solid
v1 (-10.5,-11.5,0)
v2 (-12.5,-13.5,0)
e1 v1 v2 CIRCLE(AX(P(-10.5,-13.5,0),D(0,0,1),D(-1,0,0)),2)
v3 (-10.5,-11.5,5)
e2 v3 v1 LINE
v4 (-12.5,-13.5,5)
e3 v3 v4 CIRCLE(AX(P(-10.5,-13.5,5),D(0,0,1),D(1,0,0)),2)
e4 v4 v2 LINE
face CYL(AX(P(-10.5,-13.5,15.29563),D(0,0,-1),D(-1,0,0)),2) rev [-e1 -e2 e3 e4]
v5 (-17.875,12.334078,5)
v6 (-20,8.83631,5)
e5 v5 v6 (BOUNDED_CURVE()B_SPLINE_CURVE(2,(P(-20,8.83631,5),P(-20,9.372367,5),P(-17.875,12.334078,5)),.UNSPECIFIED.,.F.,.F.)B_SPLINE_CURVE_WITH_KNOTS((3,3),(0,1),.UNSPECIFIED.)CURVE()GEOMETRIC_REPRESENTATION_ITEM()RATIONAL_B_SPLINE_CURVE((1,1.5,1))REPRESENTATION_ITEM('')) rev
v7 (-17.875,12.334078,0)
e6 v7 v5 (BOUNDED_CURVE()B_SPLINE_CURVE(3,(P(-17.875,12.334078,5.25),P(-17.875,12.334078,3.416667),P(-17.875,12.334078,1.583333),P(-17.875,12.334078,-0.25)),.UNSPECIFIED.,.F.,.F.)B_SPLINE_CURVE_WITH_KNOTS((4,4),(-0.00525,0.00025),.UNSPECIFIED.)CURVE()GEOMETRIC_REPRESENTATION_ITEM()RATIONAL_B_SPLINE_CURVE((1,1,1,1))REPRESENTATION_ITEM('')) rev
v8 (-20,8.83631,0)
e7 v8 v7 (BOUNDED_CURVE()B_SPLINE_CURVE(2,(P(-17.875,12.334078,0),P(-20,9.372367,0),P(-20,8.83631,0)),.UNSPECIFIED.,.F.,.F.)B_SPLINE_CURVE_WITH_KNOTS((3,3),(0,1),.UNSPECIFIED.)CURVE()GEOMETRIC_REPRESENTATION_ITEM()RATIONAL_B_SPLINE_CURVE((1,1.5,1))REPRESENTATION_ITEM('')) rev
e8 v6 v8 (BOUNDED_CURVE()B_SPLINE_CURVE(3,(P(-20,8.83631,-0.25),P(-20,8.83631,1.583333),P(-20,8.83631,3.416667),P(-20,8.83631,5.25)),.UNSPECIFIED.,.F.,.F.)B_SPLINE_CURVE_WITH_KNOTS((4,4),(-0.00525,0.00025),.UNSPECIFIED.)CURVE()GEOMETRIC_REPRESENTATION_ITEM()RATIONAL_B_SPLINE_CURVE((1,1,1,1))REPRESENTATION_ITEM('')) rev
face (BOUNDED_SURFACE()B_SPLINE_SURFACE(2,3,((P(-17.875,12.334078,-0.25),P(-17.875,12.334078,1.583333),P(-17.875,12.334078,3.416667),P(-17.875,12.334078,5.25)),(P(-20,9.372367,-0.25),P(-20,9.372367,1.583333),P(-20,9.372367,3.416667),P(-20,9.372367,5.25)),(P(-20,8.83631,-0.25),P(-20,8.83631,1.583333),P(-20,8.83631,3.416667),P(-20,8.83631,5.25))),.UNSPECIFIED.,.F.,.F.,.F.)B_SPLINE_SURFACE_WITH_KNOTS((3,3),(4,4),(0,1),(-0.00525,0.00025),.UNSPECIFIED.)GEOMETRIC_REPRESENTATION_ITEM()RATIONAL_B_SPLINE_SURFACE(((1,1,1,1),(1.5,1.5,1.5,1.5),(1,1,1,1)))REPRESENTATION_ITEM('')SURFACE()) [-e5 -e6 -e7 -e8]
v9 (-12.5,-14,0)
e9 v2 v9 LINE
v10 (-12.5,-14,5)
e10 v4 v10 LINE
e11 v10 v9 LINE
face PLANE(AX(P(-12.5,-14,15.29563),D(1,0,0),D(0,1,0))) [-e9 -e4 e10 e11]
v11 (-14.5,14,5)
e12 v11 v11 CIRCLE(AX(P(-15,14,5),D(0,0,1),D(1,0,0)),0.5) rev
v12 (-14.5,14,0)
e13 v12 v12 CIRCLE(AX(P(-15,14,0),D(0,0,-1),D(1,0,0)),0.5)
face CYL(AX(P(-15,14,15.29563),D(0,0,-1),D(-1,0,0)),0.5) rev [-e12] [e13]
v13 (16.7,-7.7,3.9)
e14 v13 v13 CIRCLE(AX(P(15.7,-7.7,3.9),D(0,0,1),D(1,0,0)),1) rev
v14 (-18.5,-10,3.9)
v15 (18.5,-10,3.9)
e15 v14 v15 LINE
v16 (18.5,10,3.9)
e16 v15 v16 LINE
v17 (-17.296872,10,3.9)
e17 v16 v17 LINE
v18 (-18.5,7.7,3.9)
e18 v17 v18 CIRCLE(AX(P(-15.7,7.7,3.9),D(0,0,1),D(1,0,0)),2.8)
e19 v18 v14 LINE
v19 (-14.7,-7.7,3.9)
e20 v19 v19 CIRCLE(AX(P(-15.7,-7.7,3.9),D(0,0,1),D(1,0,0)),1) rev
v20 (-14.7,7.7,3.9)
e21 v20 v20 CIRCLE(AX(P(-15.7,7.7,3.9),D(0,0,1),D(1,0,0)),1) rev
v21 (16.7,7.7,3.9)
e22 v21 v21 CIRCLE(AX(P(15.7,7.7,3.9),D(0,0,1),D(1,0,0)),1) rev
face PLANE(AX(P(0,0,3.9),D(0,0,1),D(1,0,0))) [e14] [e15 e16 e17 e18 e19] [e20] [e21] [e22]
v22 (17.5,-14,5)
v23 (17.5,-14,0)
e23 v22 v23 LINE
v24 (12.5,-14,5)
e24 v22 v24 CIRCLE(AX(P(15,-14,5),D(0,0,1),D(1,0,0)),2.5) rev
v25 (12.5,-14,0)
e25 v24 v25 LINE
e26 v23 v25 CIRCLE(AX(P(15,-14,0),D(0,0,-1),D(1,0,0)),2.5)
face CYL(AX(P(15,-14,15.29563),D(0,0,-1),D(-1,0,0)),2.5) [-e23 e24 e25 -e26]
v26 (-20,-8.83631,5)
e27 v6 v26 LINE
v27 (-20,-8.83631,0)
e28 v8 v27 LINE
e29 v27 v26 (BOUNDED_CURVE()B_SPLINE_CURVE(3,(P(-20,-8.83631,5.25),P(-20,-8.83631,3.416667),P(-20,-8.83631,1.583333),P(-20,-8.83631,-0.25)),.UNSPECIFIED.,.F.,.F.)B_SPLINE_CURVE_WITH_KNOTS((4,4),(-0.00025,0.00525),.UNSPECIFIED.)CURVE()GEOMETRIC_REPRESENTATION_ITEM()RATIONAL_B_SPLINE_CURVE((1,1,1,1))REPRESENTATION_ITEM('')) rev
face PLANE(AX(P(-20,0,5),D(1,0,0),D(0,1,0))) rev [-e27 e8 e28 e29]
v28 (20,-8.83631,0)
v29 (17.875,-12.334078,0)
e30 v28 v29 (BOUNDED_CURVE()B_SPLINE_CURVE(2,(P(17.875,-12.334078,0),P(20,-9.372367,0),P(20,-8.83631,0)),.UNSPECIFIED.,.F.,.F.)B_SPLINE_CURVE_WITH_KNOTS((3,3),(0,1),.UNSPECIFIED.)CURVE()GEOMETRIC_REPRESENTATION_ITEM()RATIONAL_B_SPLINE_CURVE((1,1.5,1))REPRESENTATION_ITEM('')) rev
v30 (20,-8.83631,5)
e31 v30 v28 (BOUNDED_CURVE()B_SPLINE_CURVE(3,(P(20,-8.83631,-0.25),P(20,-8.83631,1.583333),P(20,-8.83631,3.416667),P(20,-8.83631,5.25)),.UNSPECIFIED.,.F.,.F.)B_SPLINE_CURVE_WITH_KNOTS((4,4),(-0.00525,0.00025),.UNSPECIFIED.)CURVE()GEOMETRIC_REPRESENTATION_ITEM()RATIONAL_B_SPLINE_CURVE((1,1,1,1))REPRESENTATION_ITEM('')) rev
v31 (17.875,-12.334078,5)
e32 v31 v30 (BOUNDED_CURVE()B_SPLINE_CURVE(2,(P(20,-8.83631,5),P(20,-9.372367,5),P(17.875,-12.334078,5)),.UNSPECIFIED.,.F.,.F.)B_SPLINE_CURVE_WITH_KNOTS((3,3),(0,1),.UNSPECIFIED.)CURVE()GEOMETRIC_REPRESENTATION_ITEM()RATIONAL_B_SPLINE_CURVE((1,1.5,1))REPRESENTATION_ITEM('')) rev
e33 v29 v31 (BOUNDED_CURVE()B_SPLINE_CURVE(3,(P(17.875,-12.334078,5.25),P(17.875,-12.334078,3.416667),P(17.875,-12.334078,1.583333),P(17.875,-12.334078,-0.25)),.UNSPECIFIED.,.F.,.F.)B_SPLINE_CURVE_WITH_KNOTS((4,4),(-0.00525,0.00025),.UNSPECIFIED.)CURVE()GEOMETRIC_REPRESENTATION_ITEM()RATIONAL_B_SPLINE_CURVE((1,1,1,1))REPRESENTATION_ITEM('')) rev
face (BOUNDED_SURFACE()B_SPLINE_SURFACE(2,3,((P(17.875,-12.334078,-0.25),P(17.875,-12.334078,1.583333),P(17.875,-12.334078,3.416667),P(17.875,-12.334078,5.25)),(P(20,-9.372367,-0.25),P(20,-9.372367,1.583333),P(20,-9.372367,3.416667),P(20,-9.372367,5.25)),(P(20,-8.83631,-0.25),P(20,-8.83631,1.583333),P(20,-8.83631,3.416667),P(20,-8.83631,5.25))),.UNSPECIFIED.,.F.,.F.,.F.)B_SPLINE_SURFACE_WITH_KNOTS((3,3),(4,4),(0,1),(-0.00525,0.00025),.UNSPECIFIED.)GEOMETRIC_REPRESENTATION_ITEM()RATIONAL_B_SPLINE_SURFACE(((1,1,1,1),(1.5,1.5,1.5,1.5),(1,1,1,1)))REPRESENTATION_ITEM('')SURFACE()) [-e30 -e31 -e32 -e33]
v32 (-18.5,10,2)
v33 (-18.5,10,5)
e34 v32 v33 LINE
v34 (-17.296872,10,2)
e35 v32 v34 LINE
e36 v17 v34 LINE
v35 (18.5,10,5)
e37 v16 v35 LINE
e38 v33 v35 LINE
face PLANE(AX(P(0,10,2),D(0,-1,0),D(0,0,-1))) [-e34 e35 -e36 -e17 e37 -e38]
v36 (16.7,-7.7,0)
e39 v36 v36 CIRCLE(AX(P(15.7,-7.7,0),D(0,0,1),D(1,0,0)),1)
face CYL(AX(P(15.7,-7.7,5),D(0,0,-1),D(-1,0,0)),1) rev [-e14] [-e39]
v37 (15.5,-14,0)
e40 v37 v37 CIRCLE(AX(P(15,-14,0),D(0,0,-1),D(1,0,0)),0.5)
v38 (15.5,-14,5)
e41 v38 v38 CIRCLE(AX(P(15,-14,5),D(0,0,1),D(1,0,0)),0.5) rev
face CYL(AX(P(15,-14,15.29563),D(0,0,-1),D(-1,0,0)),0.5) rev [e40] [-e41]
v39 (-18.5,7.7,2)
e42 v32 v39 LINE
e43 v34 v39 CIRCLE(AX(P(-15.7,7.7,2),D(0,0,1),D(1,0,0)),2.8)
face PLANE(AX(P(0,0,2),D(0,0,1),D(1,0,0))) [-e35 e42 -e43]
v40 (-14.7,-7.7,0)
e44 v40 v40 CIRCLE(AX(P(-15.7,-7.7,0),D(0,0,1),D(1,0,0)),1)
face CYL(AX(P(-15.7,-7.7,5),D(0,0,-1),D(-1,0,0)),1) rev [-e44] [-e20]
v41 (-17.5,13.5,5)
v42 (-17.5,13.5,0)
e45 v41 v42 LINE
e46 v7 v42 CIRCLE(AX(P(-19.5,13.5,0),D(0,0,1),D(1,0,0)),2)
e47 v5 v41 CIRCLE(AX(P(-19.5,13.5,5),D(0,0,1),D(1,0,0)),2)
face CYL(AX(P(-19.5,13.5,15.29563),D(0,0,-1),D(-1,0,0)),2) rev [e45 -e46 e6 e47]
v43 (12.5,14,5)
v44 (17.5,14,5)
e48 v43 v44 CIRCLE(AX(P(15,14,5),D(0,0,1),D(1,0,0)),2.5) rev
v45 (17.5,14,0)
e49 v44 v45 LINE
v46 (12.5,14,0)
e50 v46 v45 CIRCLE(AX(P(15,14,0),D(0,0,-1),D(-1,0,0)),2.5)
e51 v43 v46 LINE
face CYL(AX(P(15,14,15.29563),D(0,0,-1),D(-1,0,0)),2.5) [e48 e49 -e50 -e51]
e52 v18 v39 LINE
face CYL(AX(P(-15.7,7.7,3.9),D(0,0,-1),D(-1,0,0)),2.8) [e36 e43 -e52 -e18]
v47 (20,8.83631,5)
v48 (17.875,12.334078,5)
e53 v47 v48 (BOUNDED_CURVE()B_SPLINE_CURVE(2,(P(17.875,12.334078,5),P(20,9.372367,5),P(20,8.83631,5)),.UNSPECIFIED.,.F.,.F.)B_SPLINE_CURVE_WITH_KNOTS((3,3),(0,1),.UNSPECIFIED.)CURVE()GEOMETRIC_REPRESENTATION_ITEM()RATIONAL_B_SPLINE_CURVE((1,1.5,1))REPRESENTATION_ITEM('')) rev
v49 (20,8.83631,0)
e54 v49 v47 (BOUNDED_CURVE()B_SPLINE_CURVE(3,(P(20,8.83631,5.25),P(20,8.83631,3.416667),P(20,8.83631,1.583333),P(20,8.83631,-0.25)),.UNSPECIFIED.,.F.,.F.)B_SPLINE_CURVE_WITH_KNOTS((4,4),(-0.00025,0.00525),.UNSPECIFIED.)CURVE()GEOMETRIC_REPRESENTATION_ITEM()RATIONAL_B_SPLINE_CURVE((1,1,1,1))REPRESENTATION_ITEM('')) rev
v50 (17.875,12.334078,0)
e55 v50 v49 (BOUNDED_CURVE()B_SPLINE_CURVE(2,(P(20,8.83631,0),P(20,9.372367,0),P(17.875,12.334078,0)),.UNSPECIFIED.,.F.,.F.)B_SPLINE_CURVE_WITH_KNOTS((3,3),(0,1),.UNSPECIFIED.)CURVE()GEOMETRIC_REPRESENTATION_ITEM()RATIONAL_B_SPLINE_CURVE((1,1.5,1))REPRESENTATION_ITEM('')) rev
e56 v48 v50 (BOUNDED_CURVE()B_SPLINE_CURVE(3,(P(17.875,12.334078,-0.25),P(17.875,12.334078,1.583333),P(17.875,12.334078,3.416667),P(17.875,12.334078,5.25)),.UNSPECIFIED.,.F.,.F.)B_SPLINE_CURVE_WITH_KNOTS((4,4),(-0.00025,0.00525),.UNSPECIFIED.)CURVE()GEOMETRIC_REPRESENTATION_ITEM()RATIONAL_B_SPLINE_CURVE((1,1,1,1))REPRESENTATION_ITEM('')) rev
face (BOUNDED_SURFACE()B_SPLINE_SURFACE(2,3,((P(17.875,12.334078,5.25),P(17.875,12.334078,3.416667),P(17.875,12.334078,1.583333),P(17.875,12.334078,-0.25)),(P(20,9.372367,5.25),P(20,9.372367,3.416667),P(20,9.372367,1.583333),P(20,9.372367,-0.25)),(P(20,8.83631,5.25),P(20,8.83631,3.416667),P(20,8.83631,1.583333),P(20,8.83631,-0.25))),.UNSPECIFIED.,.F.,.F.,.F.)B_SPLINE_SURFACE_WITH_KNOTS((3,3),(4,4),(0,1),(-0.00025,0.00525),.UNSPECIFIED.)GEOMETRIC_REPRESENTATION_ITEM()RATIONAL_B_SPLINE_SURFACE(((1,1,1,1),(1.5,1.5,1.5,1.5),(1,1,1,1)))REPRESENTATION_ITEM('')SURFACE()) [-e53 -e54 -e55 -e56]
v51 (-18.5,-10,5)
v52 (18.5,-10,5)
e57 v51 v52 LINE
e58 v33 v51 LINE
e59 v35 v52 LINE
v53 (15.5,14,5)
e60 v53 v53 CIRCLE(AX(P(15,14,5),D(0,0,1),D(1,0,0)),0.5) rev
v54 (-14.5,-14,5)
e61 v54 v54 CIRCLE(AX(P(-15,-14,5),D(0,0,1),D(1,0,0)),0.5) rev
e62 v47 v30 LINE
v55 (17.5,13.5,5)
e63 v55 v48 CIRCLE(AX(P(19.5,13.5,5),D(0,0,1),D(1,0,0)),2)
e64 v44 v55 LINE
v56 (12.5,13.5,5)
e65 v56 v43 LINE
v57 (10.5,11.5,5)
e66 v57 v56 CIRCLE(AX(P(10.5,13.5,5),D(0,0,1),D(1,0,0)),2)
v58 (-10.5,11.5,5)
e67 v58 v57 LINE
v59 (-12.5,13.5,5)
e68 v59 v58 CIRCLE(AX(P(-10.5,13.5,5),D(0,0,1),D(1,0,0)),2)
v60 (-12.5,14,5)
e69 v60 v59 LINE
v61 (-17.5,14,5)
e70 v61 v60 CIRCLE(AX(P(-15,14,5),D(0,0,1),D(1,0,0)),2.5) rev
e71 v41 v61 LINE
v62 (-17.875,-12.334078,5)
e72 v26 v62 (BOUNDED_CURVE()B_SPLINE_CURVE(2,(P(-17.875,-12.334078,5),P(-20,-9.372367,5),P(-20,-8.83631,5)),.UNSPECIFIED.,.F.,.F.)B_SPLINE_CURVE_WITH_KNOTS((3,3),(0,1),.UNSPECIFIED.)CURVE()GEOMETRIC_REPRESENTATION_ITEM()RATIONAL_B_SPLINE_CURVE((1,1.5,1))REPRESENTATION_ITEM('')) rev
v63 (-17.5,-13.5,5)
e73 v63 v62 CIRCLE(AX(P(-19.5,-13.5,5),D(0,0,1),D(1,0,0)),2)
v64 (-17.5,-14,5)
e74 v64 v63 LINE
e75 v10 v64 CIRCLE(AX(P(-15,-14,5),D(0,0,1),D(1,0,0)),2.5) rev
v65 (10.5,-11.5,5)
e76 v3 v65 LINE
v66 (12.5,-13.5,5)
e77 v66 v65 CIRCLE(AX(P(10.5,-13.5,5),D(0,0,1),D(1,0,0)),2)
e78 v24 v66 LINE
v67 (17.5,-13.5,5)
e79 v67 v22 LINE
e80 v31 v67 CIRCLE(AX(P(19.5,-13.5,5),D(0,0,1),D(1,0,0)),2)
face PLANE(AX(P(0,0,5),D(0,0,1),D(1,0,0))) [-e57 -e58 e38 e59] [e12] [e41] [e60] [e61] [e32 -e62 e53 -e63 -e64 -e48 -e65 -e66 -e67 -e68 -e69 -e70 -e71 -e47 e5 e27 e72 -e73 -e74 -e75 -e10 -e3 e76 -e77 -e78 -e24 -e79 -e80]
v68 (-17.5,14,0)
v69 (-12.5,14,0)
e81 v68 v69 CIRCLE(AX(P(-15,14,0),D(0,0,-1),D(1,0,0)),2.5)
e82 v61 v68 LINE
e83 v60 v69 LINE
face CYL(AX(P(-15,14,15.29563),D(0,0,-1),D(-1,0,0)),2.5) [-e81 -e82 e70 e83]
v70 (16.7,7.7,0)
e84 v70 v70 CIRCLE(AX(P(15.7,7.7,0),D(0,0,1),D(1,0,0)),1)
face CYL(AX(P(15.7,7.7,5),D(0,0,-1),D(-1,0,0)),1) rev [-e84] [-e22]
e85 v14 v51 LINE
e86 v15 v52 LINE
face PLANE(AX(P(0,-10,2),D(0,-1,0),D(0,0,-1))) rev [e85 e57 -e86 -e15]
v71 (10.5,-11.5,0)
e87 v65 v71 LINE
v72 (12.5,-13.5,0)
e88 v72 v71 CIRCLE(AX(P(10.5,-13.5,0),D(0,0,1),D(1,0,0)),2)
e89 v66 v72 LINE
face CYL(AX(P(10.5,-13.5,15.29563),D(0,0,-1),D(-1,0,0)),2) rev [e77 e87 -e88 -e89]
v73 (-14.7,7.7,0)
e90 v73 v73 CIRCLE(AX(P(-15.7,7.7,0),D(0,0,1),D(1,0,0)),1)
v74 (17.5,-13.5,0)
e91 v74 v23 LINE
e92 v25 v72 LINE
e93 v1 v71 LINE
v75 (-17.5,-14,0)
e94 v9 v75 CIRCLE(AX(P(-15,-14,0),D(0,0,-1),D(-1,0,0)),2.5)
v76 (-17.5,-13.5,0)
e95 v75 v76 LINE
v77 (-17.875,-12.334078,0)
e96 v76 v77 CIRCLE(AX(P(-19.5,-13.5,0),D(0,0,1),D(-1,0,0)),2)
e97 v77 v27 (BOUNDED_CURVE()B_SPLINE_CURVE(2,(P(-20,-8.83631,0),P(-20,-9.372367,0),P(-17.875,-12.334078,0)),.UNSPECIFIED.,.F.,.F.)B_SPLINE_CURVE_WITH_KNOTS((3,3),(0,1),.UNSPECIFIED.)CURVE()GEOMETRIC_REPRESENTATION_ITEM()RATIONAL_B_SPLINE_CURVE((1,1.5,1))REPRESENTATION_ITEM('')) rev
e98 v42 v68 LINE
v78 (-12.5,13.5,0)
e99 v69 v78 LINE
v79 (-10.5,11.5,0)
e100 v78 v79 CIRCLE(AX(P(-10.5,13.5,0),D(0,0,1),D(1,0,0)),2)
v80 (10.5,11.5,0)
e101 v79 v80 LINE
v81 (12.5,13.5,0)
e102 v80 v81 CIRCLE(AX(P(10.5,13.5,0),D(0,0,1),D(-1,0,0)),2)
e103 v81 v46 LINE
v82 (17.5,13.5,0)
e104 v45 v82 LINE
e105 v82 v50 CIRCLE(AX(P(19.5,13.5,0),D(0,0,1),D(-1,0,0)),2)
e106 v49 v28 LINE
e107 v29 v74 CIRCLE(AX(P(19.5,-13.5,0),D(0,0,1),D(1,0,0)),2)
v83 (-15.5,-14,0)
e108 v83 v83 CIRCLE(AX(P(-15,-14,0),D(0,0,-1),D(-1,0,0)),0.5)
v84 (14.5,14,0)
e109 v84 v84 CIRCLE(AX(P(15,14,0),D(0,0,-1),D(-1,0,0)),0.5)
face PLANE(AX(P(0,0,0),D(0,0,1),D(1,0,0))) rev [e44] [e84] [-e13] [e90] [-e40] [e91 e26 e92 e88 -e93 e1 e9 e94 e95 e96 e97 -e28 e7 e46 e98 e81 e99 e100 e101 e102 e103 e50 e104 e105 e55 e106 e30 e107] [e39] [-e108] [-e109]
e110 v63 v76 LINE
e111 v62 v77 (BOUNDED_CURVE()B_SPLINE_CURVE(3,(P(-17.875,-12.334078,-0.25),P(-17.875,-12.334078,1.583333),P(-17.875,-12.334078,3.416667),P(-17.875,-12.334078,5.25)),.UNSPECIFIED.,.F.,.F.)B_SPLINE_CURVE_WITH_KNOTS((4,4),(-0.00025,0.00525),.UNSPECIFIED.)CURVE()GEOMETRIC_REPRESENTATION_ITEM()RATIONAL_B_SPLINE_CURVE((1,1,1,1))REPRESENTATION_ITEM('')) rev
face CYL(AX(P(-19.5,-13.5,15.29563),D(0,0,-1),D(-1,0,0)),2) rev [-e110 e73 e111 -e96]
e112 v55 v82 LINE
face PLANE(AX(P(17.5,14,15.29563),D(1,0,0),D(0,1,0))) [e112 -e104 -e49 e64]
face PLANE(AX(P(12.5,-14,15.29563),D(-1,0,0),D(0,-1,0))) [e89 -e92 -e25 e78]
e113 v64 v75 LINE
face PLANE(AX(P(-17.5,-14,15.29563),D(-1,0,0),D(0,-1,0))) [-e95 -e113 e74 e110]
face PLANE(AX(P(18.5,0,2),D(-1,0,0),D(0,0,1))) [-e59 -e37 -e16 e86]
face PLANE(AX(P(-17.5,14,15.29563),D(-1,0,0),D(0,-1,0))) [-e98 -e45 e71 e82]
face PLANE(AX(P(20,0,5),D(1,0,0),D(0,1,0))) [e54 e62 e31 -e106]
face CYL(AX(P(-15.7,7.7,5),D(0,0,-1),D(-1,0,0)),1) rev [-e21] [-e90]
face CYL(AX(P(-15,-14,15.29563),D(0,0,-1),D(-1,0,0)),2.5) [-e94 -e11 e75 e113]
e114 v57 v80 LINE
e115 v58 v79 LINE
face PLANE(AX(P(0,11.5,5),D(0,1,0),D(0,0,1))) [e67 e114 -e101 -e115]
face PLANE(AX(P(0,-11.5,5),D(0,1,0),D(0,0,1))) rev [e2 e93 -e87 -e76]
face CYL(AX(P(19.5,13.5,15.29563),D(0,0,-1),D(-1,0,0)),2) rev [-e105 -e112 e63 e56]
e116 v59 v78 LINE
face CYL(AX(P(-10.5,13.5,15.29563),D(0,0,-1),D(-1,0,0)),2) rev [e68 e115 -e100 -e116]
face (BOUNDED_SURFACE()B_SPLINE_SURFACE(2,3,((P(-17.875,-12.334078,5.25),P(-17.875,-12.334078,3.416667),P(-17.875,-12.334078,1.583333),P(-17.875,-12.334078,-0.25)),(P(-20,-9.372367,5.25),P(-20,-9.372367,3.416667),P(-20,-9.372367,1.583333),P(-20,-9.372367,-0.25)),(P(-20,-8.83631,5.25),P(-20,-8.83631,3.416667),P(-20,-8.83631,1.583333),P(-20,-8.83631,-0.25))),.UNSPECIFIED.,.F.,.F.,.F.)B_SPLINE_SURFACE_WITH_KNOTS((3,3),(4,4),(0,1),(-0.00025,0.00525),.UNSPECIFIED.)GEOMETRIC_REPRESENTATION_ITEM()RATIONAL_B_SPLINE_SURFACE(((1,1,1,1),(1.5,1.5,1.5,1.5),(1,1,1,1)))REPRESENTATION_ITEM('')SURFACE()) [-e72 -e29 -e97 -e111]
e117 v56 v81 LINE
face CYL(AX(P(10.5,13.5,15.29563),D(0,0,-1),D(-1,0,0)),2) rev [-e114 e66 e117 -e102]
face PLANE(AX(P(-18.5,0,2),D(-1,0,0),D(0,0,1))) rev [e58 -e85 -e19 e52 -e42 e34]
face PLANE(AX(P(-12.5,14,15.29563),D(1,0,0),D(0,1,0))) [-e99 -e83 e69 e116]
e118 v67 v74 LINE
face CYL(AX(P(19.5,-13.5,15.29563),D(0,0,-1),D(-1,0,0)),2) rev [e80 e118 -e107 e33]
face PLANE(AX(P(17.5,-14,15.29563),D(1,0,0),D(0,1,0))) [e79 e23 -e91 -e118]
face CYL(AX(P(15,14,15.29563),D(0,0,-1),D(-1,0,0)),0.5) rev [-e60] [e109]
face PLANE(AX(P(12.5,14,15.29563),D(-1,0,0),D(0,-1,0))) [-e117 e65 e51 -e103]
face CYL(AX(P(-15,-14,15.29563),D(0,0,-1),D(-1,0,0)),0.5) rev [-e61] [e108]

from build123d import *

# Parameters (mm, degrees)
SKETCH_2_W             = 40
SKETCH_2_H             = 23
SKETCH_2_R             = 1
EXTRUDE_1815_DEPTH     = 5
SKETCH_3_W             = 37
SKETCH_3_H             = 20
CUT_EXTRUDE_2215_DEPTH = 3
SKETCH_4_R             = 1
EXTRUDE_2889_DEPTH     = 1.9
SKETCH_10_R            = 0.5
EXTRUDE_4733_DEPTH     = 5
FILLET_START           = -1
FILLET_5_DEPTH         = 7
FILLET_6_DEPTH         = 7
CUT_EXTRUDE_7304_DEPTH = 1.1


with BuildPart() as part:
    # Эскиз2 → Extrude 1815 (new body)
    with BuildSketch(Plane.XY):
        Rectangle(SKETCH_2_W, SKETCH_2_H)
        with Locations((15.7, -7.7)):
            Circle(SKETCH_2_R, mode=Mode.SUBTRACT)
        with Locations((-15.7, 7.7)):
            Circle(SKETCH_2_R, mode=Mode.SUBTRACT)
        with Locations((15.7, 7.7)):
            Circle(SKETCH_2_R, mode=Mode.SUBTRACT)
        with Locations((-15.7, -7.7)):
            Circle(SKETCH_2_R, mode=Mode.SUBTRACT)
    extrude(amount=EXTRUDE_1815_DEPTH)

    # Эскиз3 → Cut-Extrude 2215 (cut)
    with BuildSketch(Plane.XY.offset(5)):
        Rectangle(SKETCH_3_W, SKETCH_3_H)
    extrude(amount=-CUT_EXTRUDE_2215_DEPTH, mode=Mode.SUBTRACT)

    # Эскиз4 → Extrude 2889 (add)
    with BuildSketch(Plane.XY.offset(2)):
        with BuildLine():
            ThreePointArc((-17.296871942, 10), (-18.181052341, 8.997836384), (-18.5, 7.7))
            Line((-18.5, 7.7), (-18.5, -10))
            Line((-18.5, -10), (18.5, -10))
            Line((18.5, -10), (18.5, 10))
            Line((18.5, 10), (-17.296871942, 10))
        make_face()
        with Locations((-15.7, 7.7)):
            Circle(SKETCH_4_R, mode=Mode.SUBTRACT)
        with Locations((15.7, -7.7)):
            Circle(SKETCH_4_R, mode=Mode.SUBTRACT)
        with Locations((15.7, 7.7)):
            Circle(SKETCH_4_R, mode=Mode.SUBTRACT)
        with Locations((-15.7, -7.7)):
            Circle(SKETCH_4_R, mode=Mode.SUBTRACT)
    extrude(amount=EXTRUDE_2889_DEPTH)

    # Эскиз10 → Extrude 4733 (add)
    # profile 1 of 4: a face of its own
    with BuildSketch(Plane(origin=(0, 0, 0), x_dir=(-1, 0, 0), z_dir=(0, 0, -1))):
        with BuildLine():
            Line((-17.5, 14), (-17.5, 13.5))
            ThreePointArc((-17.5, 13.5), (-18.085786438, 12.085786438), (-19.5, 11.5))
            Line((-19.5, 11.5), (-10.5, 11.5))
            ThreePointArc((-10.5, 11.5), (-11.914213562, 12.085786438), (-12.5, 13.5))
            Line((-12.5, 13.5), (-12.5, 14))
            ThreePointArc((-12.5, 14), (-15, 16.5), (-17.5, 14))
        make_face()
        with Locations((-15, 14)):
            Circle(SKETCH_10_R, mode=Mode.SUBTRACT)
    # profile 2 of 4: a face of its own
    with BuildSketch(Plane(origin=(0, 0, 0), x_dir=(-1, 0, 0), z_dir=(0, 0, -1))):
        with BuildLine():
            Line((10.5, 11.5), (19.5, 11.5))
            ThreePointArc((19.5, 11.5), (18.085786438, 12.085786438), (17.5, 13.5))
            Line((17.5, 13.5), (17.5, 14))
            ThreePointArc((17.5, 14), (15, 16.5), (12.5, 14))
            Line((12.5, 14), (12.5, 13.5))
            ThreePointArc((12.5, 13.5), (11.914213562, 12.085786438), (10.5, 11.5))
        make_face()
        with Locations(Location((15, 14, 0), (0, 0, 180))):
            Circle(SKETCH_10_R, mode=Mode.SUBTRACT)
    # profile 3 of 4: a face of its own
    with BuildSketch(Plane(origin=(0, 0, 0), x_dir=(-1, 0, 0), z_dir=(0, 0, -1))):
        with BuildLine():
            Line((17.5, -14), (17.5, -13.5))
            ThreePointArc((17.5, -13.5), (18.085786438, -12.085786438), (19.5, -11.5))
            Line((19.5, -11.5), (10.5, -11.5))
            ThreePointArc((10.5, -11.5), (11.914213562, -12.085786438), (12.5, -13.5))
            Line((12.5, -13.5), (12.5, -14))
            ThreePointArc((12.5, -14), (15, -16.5), (17.5, -14))
        make_face()
        with Locations((15, -14)):
            Circle(SKETCH_10_R, mode=Mode.SUBTRACT)
    # profile 4 of 4: a face of its own
    with BuildSketch(Plane(origin=(0, 0, 0), x_dir=(-1, 0, 0), z_dir=(0, 0, -1))):
        with BuildLine():
            Line((-10.5, -11.5), (-19.5, -11.5))
            ThreePointArc((-19.5, -11.5), (-18.085786438, -12.085786438), (-17.5, -13.5))
            Line((-17.5, -13.5), (-17.5, -14))
            ThreePointArc((-17.5, -14), (-15, -16.5), (-12.5, -14))
            Line((-12.5, -14), (-12.5, -13.5))
            ThreePointArc((-12.5, -13.5), (-11.914213562, -12.085786438), (-10.5, -11.5))
        make_face()
        with Locations(Location((-15, -14, 0), (0, 0, 180))):
            Circle(SKETCH_10_R, mode=Mode.SUBTRACT)
    extrude(amount=-EXTRUDE_4733_DEPTH)

    # Скругление5: read off the stored shape, not the designer's step
    # Скругление5 outline → Скругление5 (cut)
    with BuildSketch(Plane.XY.offset(FILLET_START)):
        with BuildLine():
            ThreePointArc((19.5, 11.5), (18.5867215, 11.720696097), (17.875, 12.334077619))
            add(Edge.make_bspline(
                [(17.875, 12.334077619), (20, 9.372366741), (20, 8.836310473)],
                knots=[0, 0, 0, 1, 1, 1], degree=2, weights=[1, 1.5, 1]))
            Line((20, 8.836310473), (20, 11.5))
            Line((20, 11.5), (19.5, 11.5))
        make_face()
        with BuildLine():
            ThreePointArc((-19.5, -11.5), (-18.5867215, -11.720696097), (-17.875, -12.334077619))
            add(Edge.make_bspline(
                [(-17.875, -12.334077619), (-20, -9.372366741), (-20, -8.836310473)],
                knots=[0, 0, 0, 1, 1, 1], degree=2, weights=[1, 1.5, 1]))
            Line((-20, -8.836310473), (-20, -11.5))
            Line((-20, -11.5), (-19.5, -11.5))
        make_face()
    extrude(amount=FILLET_5_DEPTH, mode=Mode.SUBTRACT)

    # Скругление6: read off the stored shape, not the designer's step
    # Скругление6 outline → Скругление6 (cut)
    with BuildSketch(Plane.XY.offset(FILLET_START)):
        with BuildLine():
            add(Edge.make_bspline(
                [(-17.875, 12.334077618), (-20, 9.372366741), (-20, 8.836310473)],
                knots=[0, 0, 0, 1, 1, 1], degree=2, weights=[1, 1.5, 1]))
            ThreePointArc((-17.875, 12.334077618), (-18.5867215, 11.720696097), (-19.5, 11.5))
            Line((-19.5, 11.5), (-20, 11.5))
            Line((-20, 11.5), (-20, 8.836310473))
        make_face()
        with BuildLine():
            add(Edge.make_bspline(
                [(17.875, -12.334077618), (20, -9.372366741), (20, -8.836310473)],
                knots=[0, 0, 0, 1, 1, 1], degree=2, weights=[1, 1.5, 1]))
            ThreePointArc((17.875, -12.334077618), (18.5867215, -11.720696097), (19.5, -11.5))
            Line((19.5, -11.5), (20, -11.5))
            Line((20, -11.5), (20, -8.836310473))
        make_face()
    extrude(amount=FILLET_6_DEPTH, mode=Mode.SUBTRACT)

    # Эскиз12 → Cut-Extrude 7304 (cut)
    with BuildSketch(Plane.XY.offset(5)):
        with BuildLine():
            Line((-5.593541674, 13.75), (-10.5, 13.75))
            ThreePointArc((-10.5, 13.75), (-11.076220456, 13.834805496), (-11.60357425, 14.082030014))
            ThreePointArc((-11.60357425, 14.082030014), (-8.693066451, 12.205329008), (-5.593541674, 13.75))
        make_face()
        with BuildLine():
            Line((3.993541674, -13.75), (9.806458326, -13.75))
            ThreePointArc((9.806458326, -13.75), (6.9, -12.2), (3.993541674, -13.75))
        make_face()
    extrude(amount=-CUT_EXTRUDE_7304_DEPTH, mode=Mode.SUBTRACT)


solid = part.part
